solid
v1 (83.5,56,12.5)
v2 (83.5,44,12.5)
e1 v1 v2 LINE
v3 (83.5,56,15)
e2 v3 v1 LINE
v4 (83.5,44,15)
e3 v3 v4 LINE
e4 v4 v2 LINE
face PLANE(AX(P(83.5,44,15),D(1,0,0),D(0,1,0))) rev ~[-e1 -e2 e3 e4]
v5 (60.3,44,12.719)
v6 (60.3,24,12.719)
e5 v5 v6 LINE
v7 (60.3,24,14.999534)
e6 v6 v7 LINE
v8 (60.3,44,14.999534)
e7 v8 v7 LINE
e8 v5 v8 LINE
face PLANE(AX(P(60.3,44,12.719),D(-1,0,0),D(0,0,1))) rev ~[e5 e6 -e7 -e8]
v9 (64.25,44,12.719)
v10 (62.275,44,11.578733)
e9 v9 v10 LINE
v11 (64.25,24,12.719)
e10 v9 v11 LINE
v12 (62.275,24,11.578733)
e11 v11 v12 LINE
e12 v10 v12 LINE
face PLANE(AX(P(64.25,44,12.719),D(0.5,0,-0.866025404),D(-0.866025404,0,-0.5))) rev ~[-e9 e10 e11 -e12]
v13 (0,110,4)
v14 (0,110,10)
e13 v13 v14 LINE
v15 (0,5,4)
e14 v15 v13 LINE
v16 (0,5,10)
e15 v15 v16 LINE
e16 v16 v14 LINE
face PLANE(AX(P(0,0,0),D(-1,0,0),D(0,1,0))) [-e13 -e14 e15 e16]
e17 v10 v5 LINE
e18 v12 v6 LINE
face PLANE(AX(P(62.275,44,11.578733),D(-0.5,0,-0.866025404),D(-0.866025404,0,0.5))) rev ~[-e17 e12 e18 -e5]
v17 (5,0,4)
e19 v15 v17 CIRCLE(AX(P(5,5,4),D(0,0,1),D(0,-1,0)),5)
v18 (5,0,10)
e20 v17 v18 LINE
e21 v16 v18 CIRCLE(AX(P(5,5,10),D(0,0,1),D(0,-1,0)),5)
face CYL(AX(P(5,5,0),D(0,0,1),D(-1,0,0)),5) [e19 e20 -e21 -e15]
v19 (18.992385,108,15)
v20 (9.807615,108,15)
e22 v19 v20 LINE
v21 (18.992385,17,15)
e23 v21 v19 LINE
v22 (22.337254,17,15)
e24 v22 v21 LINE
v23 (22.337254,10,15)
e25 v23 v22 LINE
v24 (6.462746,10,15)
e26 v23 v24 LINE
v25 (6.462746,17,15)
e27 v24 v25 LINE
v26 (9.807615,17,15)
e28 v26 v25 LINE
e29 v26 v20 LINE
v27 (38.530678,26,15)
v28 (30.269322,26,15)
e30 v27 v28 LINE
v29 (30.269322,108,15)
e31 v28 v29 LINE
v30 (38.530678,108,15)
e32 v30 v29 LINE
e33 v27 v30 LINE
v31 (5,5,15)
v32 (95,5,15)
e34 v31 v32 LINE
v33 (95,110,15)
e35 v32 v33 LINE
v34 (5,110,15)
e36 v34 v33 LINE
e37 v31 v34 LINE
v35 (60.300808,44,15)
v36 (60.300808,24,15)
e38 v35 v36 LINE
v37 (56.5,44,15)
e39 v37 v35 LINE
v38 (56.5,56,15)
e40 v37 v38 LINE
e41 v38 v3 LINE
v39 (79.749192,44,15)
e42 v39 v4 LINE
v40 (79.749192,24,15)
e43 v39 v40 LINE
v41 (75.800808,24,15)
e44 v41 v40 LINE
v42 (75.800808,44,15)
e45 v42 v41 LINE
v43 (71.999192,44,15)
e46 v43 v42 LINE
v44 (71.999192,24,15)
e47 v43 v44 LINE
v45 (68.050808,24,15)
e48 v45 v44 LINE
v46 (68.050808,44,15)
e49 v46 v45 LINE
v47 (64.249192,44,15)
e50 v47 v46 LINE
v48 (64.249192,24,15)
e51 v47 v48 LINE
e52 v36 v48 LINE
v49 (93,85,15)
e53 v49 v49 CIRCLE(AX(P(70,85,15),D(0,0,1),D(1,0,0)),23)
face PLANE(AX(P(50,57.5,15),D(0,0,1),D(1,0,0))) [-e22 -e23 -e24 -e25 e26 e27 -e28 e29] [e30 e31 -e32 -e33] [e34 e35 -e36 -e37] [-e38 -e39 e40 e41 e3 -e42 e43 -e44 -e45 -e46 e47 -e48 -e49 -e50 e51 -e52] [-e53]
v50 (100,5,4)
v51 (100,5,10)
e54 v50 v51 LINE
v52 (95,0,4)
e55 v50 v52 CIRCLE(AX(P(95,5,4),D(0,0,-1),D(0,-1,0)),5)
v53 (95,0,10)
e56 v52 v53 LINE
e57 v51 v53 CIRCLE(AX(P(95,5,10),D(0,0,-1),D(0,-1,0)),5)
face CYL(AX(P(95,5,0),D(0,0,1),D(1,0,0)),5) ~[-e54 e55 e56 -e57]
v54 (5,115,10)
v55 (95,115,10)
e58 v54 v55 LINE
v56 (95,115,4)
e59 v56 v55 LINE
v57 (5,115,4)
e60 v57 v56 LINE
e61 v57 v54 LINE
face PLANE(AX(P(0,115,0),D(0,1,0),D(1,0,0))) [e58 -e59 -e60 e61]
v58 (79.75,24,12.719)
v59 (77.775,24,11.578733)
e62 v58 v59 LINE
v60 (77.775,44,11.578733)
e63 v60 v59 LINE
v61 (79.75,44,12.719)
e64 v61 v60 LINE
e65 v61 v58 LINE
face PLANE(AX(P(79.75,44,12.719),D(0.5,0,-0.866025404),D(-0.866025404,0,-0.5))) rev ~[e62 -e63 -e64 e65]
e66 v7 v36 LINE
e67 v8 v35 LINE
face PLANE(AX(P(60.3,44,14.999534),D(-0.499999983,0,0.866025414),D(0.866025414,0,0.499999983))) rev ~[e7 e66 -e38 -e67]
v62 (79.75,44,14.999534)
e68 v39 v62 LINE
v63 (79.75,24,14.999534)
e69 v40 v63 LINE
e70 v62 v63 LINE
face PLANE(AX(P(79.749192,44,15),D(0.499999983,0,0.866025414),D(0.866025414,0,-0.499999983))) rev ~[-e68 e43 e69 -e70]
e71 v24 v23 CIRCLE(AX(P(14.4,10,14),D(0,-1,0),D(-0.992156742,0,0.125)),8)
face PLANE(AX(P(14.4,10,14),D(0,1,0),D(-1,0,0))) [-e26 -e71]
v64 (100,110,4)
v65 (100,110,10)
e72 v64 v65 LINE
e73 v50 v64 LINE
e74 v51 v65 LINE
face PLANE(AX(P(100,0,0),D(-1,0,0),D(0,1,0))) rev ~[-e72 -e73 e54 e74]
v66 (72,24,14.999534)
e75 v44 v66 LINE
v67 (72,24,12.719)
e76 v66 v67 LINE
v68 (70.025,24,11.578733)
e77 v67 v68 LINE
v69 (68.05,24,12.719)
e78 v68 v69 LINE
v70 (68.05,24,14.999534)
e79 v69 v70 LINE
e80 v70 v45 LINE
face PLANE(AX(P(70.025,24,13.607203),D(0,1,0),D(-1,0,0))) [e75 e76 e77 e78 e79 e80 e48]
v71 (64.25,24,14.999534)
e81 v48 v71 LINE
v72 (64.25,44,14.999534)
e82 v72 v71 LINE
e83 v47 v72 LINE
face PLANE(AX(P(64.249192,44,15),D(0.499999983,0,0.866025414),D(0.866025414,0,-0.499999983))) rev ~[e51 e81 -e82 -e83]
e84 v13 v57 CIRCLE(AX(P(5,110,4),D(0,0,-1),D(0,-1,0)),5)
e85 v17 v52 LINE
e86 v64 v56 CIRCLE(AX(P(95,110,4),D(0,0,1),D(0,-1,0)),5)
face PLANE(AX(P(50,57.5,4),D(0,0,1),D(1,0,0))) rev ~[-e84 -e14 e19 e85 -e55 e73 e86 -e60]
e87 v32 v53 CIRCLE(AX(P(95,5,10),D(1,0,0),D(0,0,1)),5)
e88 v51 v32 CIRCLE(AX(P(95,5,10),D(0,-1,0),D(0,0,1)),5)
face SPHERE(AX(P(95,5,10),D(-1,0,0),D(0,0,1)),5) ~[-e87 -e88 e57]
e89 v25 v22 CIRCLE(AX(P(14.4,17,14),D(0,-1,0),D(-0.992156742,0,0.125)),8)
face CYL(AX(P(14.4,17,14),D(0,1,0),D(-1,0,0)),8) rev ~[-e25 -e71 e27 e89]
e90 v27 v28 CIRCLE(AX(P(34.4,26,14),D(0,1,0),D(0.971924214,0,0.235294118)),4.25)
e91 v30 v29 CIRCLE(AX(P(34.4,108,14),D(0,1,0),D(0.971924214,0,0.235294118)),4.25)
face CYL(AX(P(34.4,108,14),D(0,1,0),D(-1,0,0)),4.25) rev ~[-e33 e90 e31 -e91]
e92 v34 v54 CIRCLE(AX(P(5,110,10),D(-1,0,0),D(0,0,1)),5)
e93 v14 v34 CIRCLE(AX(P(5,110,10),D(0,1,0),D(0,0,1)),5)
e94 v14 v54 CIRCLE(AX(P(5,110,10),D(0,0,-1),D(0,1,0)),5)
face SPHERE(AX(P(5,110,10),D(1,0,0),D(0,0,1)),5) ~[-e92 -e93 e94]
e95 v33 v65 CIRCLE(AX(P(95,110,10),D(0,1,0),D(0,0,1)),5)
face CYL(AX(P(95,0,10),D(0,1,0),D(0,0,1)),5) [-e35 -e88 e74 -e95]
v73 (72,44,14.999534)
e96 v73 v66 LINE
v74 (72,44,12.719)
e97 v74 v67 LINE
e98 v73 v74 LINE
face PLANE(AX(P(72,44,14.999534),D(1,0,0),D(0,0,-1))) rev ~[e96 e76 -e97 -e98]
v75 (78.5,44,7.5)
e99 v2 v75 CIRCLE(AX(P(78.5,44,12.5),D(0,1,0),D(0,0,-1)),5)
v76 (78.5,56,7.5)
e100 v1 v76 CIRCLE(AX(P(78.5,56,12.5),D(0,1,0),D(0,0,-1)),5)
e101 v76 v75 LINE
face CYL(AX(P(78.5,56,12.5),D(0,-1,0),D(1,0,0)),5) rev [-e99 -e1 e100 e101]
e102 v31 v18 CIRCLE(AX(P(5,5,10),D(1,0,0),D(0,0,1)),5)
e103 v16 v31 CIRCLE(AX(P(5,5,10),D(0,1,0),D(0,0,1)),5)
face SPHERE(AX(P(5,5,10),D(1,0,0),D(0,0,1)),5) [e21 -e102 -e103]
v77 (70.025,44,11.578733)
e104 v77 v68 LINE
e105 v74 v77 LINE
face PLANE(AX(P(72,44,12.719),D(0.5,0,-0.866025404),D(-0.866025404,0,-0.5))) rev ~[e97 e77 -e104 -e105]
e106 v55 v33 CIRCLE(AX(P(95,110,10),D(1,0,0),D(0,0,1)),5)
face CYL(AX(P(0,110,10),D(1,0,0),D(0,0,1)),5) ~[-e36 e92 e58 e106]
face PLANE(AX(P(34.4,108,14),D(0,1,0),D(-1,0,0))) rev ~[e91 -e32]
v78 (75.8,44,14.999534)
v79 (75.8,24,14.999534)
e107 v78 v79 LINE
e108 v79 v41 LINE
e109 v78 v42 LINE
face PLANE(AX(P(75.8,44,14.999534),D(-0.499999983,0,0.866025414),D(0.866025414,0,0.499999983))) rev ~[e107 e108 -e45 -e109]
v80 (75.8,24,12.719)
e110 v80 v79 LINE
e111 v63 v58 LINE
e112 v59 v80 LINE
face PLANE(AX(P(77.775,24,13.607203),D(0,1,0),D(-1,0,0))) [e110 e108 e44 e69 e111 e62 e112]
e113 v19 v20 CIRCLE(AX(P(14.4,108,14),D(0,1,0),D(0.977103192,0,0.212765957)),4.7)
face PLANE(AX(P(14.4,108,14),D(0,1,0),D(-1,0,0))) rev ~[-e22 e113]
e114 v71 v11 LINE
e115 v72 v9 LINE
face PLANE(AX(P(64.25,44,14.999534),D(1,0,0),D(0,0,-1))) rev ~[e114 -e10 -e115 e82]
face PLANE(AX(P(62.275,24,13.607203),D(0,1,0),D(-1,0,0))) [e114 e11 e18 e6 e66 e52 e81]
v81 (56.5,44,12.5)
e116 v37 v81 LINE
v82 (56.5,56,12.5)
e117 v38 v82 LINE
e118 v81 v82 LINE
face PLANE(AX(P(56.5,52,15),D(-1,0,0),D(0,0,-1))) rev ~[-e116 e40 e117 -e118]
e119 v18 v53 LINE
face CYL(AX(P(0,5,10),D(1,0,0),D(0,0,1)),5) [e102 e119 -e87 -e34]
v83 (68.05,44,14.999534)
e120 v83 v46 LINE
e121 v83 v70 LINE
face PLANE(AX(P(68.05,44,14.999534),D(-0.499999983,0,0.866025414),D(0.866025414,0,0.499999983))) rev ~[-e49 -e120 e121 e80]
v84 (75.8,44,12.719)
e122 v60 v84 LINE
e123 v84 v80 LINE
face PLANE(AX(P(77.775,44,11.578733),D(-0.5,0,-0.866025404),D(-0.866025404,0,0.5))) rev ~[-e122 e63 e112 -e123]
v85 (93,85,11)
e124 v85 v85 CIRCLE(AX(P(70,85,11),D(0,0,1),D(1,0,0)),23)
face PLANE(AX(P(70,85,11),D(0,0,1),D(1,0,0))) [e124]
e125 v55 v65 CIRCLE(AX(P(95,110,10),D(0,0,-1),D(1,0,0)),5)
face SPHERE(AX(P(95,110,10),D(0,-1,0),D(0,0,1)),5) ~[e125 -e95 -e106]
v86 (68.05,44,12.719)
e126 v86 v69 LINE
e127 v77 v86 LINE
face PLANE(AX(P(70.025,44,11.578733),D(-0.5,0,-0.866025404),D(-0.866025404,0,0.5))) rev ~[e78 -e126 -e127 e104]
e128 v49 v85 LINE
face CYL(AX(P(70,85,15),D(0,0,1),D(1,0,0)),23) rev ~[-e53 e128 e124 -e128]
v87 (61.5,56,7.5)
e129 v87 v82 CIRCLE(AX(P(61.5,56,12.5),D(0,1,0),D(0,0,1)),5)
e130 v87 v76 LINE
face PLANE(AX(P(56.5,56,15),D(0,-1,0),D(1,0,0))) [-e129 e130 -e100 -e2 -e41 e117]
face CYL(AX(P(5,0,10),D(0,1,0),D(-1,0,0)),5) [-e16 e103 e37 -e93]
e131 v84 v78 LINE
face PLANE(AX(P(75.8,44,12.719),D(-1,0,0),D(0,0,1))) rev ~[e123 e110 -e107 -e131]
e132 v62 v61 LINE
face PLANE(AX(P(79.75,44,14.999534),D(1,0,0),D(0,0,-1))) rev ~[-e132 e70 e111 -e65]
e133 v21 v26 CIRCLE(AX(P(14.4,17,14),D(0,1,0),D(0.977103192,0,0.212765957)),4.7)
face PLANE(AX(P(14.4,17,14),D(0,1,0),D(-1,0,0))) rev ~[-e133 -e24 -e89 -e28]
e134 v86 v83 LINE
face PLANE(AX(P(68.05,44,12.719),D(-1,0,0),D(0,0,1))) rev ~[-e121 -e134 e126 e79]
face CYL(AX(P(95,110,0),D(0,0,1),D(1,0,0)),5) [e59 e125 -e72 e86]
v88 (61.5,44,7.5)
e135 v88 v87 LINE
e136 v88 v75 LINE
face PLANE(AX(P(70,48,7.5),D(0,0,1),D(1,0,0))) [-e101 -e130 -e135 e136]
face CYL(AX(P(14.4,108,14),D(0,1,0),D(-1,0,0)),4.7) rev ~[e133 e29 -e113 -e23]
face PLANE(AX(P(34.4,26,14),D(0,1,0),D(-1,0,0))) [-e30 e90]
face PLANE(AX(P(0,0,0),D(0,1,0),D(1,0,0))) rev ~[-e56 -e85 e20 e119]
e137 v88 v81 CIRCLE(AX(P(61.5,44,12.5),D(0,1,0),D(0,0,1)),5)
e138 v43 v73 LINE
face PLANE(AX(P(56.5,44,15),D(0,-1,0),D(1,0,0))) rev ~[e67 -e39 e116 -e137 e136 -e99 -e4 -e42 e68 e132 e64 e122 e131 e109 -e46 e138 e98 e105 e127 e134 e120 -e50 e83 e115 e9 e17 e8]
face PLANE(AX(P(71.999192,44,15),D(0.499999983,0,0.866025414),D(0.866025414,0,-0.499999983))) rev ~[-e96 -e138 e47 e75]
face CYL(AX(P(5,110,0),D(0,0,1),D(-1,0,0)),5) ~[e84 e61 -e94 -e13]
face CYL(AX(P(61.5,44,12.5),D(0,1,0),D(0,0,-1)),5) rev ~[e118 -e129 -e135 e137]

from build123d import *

# Parameters (mm, degrees)
F0_W      = 100
F0_H      = 115
F1_DEPTH  = 15
F2_R      = 23
F3_DEPTH  = 4
F5_R      = 4.7
F6_DEPTH  = 91
F7_R      = 8
F8_DEPTH  = 7
F9_R      = 4.25
F10_DEPTH = 82
F11_W     = 27
F11_H     = 8
F12_DEPTH = 7.5
F14_DEPTH = 20
F15_DEPTH = 4
F16_R     = 5
F17_DEPTH = 4


with BuildPart() as f1:
    # F0 (on Top) → F1 (new body)
    with BuildSketch(Plane.XY):
        with Locations((50, 57.5)):
            Rectangle(F0_W, F0_H)
    extrude(amount=F1_DEPTH)

    # F2 (on face) → F3 (cut)
    with BuildSketch(Plane.XY.offset(15)):
        with Locations((70, 85)):
            Circle(F2_R)
    extrude(amount=-F3_DEPTH, mode=Mode.SUBTRACT)

    # F5 (on offset) → F6 (cut)
    with BuildSketch(Plane(origin=(0, 108, 0), x_dir=(-1, 0, 0), z_dir=(0, 1, 0))):
        with Locations((-14.4, 14)):
            Circle(F5_R)
    extrude(amount=-F6_DEPTH, mode=Mode.SUBTRACT)

    # F7 (on face) → F8 (cut)
    with BuildSketch(Plane(origin=(0, 17, 0), x_dir=(-1, 0, 0), z_dir=(0, 1, 0))):
        with Locations((-14.4, 14)):
            Circle(F7_R)
        with BuildLine():
            ThreePointArc((-9.8076149987, 15), (-14.4, 9.3), (-18.9923850013, 15))
            Line((-18.9923850013, 15), (-9.8076149987, 15))
        make_face(mode=Mode.SUBTRACT)
        with BuildLine():
            Line((-9.8076149987, 15), (-18.9923850013, 15))
            ThreePointArc((-18.9923850013, 15), (-14.4, 9.3), (-9.8076149987, 15))
        make_face()
    extrude(amount=-F8_DEPTH, mode=Mode.SUBTRACT)

    # F9 (on offset) → F10 (cut)
    with BuildSketch(Plane(origin=(0, 108, 0), x_dir=(-1, 0, 0), z_dir=(0, 1, 0))):
        with Locations((-34.4, 14)):
            Circle(F9_R)
    extrude(amount=-F10_DEPTH, mode=Mode.SUBTRACT)

    # F11 (on face) → F12 (cut)
    with BuildSketch(Plane.XY.offset(15)):
        with Locations((70, 48)):
            Rectangle(F11_W, F11_H)
    extrude(amount=-F12_DEPTH, mode=Mode.SUBTRACT)

    # F13 (on face) → F14 (cut)
    with BuildSketch(Plane(origin=(0, 44, 0), x_dir=(-1, 0, 0), z_dir=(0, 1, 0))):
        Polygon((-79.75, 14.9995335633), (-79.75, 12.719), (-77.775, 11.5787332184), (-75.8, 12.719), (-75.8, 14.9995335633), (-75.8008078921, 15), (-79.7491921079, 15), align=None)
        Polygon((-68.0508078921, 15), (-71.9991921079, 15), (-72, 14.9995335633), (-72, 12.719), (-70.025, 11.5787332184), (-68.05, 12.719), (-68.05, 14.9995335633), align=None)
        Polygon((-60.3008078921, 15), (-64.2491921079, 15), (-64.25, 14.9995335633), (-64.25, 12.719), (-62.275, 11.5787332184), (-60.3, 12.719), (-60.3, 14.9995335633), align=None)
    extrude(amount=-F14_DEPTH, mode=Mode.SUBTRACT)

    # F15 (cut): a face of the model
    f15_faces = [f1.faces().sort_by_distance(p)[0] for p in [
        (70, 52, 11.25),
    ]]
    extrude(f15_faces, amount=-F15_DEPTH, mode=Mode.SUBTRACT)

    # F16
    f16_edges = [f1.edges().sort_by_distance(p)[0] for p in [
        (50, 0, 15),
        (100, 57.5, 15),
        (50, 115, 15),
        (0, 57.5, 15),
        (100, 115, 7.5),
        (0, 115, 7.5),
        (100, 0, 7.5),
        (0, 0, 7.5),
        (56.5, 50, 7.5),
        (83.5, 50, 7.5),
    ]]
    fillet(f16_edges, radius=F16_R)

    # F17 (cut): a face of the model
    f17_faces = [f1.faces().sort_by_distance(p)[0] for p in [
        (50, 57.5, 0),
    ]]
    extrude(f17_faces, amount=-F17_DEPTH, mode=Mode.SUBTRACT)


solid = f1.part
